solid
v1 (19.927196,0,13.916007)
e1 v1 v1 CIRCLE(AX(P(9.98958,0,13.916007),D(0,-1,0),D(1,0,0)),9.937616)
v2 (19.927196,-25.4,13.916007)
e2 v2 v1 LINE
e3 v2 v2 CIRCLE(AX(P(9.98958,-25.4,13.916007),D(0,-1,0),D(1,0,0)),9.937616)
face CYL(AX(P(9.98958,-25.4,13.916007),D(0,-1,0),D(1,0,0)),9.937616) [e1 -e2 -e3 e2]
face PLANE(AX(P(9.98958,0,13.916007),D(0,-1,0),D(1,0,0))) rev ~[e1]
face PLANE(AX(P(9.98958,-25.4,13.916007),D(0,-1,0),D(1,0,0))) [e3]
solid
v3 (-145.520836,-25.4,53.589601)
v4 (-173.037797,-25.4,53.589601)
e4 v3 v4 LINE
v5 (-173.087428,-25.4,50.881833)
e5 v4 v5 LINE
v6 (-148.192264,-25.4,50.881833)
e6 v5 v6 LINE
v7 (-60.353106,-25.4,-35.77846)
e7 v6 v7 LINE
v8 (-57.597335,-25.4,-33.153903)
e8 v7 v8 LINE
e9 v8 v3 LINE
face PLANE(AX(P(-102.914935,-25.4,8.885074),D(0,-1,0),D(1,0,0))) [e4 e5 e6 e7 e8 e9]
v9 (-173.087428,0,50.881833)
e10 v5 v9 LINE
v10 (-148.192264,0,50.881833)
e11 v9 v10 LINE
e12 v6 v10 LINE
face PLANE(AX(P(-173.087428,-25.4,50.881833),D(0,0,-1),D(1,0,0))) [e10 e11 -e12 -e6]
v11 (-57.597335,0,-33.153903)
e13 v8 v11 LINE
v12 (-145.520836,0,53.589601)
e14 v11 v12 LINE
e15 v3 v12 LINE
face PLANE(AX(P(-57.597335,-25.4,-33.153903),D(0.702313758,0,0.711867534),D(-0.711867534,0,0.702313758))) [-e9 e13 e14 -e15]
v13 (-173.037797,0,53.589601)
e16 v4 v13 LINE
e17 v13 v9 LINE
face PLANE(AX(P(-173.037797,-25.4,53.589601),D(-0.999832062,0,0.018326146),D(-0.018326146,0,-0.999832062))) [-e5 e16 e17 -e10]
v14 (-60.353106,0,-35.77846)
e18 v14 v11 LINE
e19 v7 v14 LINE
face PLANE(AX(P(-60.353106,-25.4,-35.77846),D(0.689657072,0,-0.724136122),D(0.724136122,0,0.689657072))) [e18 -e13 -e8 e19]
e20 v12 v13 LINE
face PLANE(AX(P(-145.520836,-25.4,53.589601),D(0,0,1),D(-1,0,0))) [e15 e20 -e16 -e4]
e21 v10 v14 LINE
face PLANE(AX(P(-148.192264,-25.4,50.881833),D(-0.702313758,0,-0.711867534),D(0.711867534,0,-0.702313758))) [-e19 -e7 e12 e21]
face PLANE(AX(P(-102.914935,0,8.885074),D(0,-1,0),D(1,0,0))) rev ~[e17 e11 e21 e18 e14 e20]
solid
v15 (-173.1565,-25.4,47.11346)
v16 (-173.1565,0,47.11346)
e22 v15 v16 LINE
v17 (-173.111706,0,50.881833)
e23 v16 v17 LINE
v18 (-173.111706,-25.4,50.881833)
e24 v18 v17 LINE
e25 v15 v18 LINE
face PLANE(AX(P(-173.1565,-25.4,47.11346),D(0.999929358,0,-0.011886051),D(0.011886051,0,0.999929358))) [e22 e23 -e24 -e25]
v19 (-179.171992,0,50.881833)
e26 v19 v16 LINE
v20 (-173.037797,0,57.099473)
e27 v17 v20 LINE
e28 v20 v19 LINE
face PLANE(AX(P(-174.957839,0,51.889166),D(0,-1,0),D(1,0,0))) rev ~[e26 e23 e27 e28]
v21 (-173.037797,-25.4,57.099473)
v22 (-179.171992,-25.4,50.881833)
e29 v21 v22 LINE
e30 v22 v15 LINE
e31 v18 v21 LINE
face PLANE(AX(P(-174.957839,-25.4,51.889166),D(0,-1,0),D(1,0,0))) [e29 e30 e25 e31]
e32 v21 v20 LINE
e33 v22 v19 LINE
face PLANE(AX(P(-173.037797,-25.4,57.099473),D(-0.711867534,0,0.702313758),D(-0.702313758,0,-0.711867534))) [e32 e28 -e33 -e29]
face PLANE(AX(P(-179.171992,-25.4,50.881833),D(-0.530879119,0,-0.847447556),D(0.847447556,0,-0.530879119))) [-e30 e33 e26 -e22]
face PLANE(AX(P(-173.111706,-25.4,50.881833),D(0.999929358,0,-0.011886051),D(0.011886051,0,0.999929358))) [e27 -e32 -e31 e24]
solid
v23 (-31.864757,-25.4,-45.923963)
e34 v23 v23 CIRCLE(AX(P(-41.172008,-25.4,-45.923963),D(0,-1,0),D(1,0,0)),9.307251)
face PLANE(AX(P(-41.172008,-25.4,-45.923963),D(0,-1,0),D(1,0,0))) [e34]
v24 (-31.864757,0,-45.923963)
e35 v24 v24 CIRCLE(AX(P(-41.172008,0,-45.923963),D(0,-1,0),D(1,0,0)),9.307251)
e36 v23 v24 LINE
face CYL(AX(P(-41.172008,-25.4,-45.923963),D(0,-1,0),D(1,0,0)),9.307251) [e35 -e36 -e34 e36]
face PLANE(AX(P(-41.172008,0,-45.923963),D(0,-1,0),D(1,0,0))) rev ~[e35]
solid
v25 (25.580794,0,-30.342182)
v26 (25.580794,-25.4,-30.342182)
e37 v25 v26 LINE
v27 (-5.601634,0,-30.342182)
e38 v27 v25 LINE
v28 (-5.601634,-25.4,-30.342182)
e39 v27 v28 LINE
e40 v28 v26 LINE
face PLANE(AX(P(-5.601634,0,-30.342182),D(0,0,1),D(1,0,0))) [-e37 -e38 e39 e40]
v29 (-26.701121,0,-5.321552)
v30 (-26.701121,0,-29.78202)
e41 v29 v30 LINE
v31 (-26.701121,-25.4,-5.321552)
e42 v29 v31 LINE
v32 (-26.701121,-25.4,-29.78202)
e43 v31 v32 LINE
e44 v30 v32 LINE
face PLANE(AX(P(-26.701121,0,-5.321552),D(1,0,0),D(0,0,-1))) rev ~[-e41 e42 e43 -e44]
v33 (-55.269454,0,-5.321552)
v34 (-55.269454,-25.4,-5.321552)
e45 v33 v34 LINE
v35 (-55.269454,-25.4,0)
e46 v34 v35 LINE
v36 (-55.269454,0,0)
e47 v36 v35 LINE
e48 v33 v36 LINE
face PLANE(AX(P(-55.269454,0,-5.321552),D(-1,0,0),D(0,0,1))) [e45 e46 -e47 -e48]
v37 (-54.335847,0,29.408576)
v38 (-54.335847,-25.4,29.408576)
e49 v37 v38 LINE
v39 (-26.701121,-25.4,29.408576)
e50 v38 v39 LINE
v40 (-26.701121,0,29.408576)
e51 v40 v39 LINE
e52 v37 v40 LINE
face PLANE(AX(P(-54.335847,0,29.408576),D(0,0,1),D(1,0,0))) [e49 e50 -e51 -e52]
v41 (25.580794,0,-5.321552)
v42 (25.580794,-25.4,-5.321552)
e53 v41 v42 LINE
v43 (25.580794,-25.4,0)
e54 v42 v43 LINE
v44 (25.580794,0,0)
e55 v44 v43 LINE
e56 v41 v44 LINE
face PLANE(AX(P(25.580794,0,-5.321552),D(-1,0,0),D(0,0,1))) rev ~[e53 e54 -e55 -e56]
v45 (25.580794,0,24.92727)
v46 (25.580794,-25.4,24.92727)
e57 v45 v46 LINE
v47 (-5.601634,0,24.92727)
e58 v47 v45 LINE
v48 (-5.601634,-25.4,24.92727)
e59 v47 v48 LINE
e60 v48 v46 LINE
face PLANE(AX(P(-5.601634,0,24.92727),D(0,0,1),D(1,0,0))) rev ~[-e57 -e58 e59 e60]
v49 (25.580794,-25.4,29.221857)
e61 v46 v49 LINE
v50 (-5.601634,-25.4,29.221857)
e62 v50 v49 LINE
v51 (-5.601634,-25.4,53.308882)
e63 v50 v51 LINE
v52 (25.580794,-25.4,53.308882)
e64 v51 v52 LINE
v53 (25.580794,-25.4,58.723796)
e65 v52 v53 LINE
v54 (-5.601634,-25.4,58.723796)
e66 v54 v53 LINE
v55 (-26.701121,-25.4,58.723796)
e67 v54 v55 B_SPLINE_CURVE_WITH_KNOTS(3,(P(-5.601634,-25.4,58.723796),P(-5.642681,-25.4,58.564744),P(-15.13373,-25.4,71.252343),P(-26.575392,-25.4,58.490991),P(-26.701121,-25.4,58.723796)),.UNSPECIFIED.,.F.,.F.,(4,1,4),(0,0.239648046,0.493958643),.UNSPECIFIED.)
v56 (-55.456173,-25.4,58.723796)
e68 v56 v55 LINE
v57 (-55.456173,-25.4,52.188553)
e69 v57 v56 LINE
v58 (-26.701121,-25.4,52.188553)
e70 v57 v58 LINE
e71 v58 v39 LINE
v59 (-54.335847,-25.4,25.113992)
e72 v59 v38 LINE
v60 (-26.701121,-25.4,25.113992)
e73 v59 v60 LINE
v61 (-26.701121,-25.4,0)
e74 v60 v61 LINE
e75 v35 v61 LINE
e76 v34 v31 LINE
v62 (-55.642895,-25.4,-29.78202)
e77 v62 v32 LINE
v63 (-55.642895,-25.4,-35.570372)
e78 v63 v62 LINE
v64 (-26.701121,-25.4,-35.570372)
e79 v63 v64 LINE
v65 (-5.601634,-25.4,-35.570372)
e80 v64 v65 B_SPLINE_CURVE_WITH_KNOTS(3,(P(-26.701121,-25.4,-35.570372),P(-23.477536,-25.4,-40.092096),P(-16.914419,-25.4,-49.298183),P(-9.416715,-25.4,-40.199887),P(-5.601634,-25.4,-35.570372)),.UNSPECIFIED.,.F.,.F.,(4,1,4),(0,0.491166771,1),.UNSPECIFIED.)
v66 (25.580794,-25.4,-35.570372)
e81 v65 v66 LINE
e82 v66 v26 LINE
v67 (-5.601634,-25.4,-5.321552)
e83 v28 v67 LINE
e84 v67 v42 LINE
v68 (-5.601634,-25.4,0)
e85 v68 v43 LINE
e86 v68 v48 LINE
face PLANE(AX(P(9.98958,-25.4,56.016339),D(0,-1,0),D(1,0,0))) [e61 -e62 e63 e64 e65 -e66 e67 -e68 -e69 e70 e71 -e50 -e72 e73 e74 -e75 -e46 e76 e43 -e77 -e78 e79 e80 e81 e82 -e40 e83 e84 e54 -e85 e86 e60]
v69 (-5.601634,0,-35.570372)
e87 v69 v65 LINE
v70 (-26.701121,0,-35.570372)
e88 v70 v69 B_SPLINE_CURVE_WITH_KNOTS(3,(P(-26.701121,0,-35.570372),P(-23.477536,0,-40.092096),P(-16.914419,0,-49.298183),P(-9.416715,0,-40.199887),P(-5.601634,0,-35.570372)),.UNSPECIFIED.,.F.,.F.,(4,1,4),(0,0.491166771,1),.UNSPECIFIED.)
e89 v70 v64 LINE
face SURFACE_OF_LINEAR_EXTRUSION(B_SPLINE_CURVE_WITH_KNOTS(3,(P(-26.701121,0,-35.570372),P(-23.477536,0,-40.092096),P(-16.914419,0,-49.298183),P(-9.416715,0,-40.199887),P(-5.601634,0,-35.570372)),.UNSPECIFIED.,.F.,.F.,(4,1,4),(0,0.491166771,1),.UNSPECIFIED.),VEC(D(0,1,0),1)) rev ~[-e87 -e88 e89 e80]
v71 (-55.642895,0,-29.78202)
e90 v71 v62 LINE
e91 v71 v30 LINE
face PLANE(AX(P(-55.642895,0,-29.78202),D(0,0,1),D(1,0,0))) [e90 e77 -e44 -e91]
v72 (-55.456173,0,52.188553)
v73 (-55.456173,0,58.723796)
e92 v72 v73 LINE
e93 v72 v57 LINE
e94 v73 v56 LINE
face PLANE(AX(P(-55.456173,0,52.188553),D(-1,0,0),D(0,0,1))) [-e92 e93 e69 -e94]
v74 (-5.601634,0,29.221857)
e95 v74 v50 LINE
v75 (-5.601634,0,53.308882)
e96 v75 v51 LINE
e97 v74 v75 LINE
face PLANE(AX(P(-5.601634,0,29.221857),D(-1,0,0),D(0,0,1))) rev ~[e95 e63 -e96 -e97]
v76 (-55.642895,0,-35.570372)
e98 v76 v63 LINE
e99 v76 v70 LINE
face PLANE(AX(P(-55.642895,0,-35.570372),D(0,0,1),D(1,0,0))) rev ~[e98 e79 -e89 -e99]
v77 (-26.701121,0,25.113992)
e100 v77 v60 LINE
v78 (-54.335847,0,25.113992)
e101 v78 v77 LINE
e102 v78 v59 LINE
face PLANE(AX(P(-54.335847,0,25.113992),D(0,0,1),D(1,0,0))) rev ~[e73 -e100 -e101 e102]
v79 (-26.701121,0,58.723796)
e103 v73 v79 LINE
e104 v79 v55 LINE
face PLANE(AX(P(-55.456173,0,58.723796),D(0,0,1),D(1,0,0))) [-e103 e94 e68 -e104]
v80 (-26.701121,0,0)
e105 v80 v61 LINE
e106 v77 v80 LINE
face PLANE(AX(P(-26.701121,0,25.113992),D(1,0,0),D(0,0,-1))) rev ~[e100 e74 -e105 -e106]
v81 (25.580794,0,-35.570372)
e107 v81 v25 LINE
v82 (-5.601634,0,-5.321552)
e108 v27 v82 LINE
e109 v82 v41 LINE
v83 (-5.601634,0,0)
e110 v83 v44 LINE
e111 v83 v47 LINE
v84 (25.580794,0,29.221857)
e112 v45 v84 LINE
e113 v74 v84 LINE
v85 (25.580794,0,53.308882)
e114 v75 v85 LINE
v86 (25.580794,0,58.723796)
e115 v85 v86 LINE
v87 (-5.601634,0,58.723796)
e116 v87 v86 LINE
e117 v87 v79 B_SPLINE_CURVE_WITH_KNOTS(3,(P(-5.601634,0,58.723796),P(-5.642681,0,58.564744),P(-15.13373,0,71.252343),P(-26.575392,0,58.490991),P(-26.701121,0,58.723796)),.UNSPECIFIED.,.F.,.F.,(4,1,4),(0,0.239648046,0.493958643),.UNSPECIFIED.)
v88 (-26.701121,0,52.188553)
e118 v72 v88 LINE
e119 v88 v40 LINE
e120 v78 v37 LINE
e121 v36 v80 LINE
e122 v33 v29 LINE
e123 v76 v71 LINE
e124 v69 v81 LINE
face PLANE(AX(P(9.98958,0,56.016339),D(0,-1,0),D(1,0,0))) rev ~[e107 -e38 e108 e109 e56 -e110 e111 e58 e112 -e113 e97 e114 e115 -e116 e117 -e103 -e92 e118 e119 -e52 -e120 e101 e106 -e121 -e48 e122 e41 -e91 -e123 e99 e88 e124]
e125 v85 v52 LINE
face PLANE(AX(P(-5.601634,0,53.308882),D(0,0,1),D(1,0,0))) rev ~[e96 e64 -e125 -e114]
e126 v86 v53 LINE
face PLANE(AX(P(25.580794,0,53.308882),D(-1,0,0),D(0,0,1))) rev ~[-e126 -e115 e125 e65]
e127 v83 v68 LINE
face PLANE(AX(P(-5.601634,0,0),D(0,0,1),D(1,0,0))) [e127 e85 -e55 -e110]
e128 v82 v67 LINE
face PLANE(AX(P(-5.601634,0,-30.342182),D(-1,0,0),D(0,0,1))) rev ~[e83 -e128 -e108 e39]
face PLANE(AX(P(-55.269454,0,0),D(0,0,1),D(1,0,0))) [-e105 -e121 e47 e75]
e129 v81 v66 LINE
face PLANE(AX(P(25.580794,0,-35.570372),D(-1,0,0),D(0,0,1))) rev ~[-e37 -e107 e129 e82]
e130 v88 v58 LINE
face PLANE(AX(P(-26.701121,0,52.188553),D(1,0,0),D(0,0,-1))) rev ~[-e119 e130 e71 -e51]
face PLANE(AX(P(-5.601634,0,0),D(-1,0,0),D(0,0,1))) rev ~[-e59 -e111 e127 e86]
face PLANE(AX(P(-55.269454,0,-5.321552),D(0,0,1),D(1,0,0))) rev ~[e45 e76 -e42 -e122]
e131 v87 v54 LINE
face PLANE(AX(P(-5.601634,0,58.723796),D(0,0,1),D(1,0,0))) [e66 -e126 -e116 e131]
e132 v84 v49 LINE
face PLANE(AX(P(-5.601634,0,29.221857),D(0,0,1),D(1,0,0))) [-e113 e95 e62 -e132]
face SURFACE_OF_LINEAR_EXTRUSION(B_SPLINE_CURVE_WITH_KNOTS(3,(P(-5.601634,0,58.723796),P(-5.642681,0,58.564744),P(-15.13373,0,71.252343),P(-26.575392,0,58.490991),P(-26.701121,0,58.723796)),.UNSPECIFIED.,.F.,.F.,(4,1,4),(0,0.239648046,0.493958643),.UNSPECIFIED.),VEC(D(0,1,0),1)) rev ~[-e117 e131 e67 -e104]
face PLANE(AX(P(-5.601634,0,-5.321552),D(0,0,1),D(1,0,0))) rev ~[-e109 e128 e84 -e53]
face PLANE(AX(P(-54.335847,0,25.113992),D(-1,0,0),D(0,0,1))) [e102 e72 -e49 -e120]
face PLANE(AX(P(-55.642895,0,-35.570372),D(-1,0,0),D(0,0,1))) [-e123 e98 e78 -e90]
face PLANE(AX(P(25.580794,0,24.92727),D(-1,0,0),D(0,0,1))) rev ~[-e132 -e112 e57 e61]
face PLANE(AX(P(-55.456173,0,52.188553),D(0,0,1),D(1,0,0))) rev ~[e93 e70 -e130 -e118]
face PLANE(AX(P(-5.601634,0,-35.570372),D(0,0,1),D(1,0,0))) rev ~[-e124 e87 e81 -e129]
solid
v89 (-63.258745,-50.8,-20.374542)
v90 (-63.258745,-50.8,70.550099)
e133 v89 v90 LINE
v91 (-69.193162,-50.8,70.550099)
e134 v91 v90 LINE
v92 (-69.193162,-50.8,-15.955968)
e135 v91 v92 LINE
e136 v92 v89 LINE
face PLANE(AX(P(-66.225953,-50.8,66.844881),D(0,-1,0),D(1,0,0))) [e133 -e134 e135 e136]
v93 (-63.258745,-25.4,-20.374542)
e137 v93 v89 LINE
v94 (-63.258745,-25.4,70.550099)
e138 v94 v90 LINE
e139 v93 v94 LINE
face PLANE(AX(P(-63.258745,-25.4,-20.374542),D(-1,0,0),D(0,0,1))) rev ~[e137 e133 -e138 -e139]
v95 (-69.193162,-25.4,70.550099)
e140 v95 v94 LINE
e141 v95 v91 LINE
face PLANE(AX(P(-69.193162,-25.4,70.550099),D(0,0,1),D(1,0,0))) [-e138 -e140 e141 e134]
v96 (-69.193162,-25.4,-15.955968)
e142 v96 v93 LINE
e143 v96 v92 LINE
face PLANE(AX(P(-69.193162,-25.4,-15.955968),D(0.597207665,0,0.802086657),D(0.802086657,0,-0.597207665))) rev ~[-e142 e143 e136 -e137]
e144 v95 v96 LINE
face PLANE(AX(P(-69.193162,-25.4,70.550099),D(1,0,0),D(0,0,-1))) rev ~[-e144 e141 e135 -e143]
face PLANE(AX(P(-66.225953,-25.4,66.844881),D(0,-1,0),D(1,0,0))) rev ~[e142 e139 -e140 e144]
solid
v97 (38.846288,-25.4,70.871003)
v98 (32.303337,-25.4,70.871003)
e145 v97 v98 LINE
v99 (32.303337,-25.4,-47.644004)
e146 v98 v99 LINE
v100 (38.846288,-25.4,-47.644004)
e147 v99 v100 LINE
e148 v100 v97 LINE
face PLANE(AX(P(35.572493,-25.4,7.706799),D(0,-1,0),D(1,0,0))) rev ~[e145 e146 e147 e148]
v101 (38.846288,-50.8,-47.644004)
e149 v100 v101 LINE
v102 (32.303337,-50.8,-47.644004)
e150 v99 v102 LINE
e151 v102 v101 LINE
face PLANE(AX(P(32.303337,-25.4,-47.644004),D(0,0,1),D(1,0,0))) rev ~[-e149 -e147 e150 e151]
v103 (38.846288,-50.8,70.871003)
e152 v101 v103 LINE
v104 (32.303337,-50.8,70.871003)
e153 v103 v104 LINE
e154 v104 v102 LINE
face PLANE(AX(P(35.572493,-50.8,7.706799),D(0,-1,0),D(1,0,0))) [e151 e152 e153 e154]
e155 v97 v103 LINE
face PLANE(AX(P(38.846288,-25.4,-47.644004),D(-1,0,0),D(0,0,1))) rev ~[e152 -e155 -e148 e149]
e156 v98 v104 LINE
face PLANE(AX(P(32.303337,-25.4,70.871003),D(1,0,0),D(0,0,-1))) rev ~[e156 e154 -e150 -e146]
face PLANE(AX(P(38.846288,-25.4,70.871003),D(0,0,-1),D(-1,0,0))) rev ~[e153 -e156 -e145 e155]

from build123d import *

# Parameters (mm, degrees)
F0_W     = 31.1824278906
F0_H     = 5.4149143398
F0_W_2   = 28.7550520152
F0_H_2   = 6.535243243
F0_W_3   = 27.6347268373
F0_H_3   = 4.2945835739
F0_H_4   = 4.2945872992
F0_H_5   = 5.3215520456
F0_W_4   = 28.5683330148
F0_W_5   = 28.9417747408
F0_H_6   = 5.7883523405
F0_H_7   = 5.2281897515
F1_DEPTH = 25.4
F2_R     = 9.9376162311
F3_DEPTH = 25.4
F2_R_2   = 9.3072509838
F5_DEPTH = 25.4
F4_W     = 5.9344172478
F4_H     = 7.4104368687


# Not quite as in the source:
# - the program builds the solid bodies; features that only make, move or delete a surface that nothing else refers to are left out


with BuildPart() as f1:
    # F0 (on Front) → F1 (new body)
    with BuildSketch(Plane.XZ):
        with Locations((9.9895796739, 56.0163389891)):
            Rectangle(F0_W, F0_H)
        with BuildLine():
            Line((-5.6016342714, 24.9272696674), (-5.6016342714, 29.2218569666))
            Line((-5.6016342714, 29.2218569666), (-5.6016342714, 53.3088818192))
            Line((-5.6016342714, 53.3088818192), (-5.6016342714, 58.723796159))
            add(Edge.make_bspline(
                [(-5.6016342714, 58.723796159), (-5.6426806139, 58.5647439553), (-15.1337303989, 71.2523431637), (-26.5753917973, 58.490990697), (-26.7011206597, 58.723796159)],
                knots=[0, 0, 0, 0, 0.2396480462, 0.4939586428, 0.4939586428, 0.4939586428, 0.4939586428], degree=3))
            Line((-26.7011206597, 58.723796159), (-26.7011206597, 52.188552916))
            Line((-26.7011206597, 52.188552916), (-26.7011206597, 29.408575967))
            Line((-26.7011206597, 29.408575967), (-26.7011206597, 25.113992393))
            Line((-26.7011206597, 25.113992393), (-26.7011206597, 0))
            Line((-26.7011206597, 0), (-26.7011206597, -5.3215520456))
            Line((-26.7011206597, -5.3215520456), (-26.7011206597, -16.7115405202))
            Line((-26.7011206597, -16.7115405202), (-26.7011206597, -29.7820195556))
            Line((-26.7011206597, -29.7820195556), (-26.7011206597, -35.570371896))
            add(Edge.make_bspline(
                [(-26.7011206597, -35.570371896), (-23.4775358451, -40.0920960999), (-16.914419193, -49.2981834607), (-9.4167152022, -40.1998873057), (-5.6016342714, -35.570371896)],
                knots=[0, 0, 0, 0, 0.4911667711, 1, 1, 1, 1], degree=3))
            Line((-5.6016342714, -35.570371896), (-5.6016342714, -30.3421821445))
            Line((-5.6016342714, -30.3421821445), (-5.6016342714, -5.3215520456))
            Line((-5.6016342714, -5.3215520456), (-5.6016342714, 0))
            Line((-5.6016342714, 0), (-5.6016342714, 24.9272696674))
        make_face()
        with Locations((-41.0786466673, 55.4561745375)):
            Rectangle(F0_W_2, F0_H_2)
        with Locations((-40.5184840783, 27.26128418)):
            Rectangle(F0_W_3, F0_H_3)
        with Locations((9.9895796739, 27.074563317)):
            Rectangle(F0_W, F0_H_4)
        with Locations((9.9895796739, -2.6607760228)):
            Rectangle(F0_W, F0_H_5)
        with Locations((-40.9852871671, -2.6607760228)):
            Rectangle(F0_W_4, F0_H_5)
        with Locations((-41.1720080301, -32.6761957258)):
            Rectangle(F0_W_5, F0_H_6)
        with Locations((9.9895796739, -32.9562770203)):
            Rectangle(F0_W, F0_H_7)
    extrude(amount=F1_DEPTH)


with BuildPart() as f3:
    # F2 (on face) → F3 (new body)
    with BuildSketch(Plane.XZ.offset(25.4)):
        with Locations((9.9895796739, 13.9160072431)):
            Circle(F2_R)
    extrude(amount=-F3_DEPTH)


with BuildPart() as f3b:
    # F2 (on face) → F3, piece 2 (new body)
    with BuildSketch(Plane.XZ.offset(25.4)):
        with Locations((-41.1720080301, -45.9239631891)):
            Circle(F2_R_2)
    extrude(amount=-F3_DEPTH)


with BuildPart() as f3c:
    # F2 (on face) → F3, piece 3 (new body)
    with BuildSketch(Plane.XZ.offset(25.4)):
        Polygon((-60.3531059439, -35.778459874), (-57.597335428, -33.1539027393), (-145.5208361149, 53.5896010697), (-148.1922638691, 50.881833114), align=None)
        Polygon((-148.1922638691, 50.881833114), (-145.5208361149, 53.5896010697), (-173.0377972126, 53.5896010697), (-173.0874284987, 50.881833114), align=None)
    extrude(amount=-F3_DEPTH)


with BuildPart() as f3d:
    # F2 (on face) → F3, piece 4 (new body)
    with BuildSketch(Plane.XZ.offset(25.4)):
        Polygon((-173.1564998627, 47.1134595573), (-173.111705617, 50.881833114), (-173.0377972126, 57.0994727314), (-179.1719916159, 50.881833114), align=None)
    extrude(amount=-F3_DEPTH)


with BuildPart() as f5:
    # F4 (on face) → F5 (new body)
    with BuildSketch(Plane.XZ.offset(25.4)):
        Polygon((38.8462878764, 62.9734322429), (32.3033370078, 63.1396621466), (32.3033370078, -47.6440042257), (38.8462878764, -47.6440042257), align=None)
        Polygon((32.3033370078, 70.8710029721), (32.3033370078, 63.1396621466), (38.8462878764, 62.9734322429), (38.8462878764, 70.8710029721), align=None)
    extrude(amount=F5_DEPTH)


with BuildPart() as f5b:
    # F4 (on face) → F5, piece 2 (new body)
    with BuildSketch(Plane.XZ.offset(25.4)):
        with Locations((-66.2259534001, 66.8448805809)):
            Rectangle(F4_W, F4_H)
        Polygon((-63.2587447762, -20.3745421022), (-63.2587447762, 63.1396621466), (-69.193162024, 63.1396621466), (-69.193162024, -15.9559678286), align=None)
    extrude(amount=F5_DEPTH)


solid = Compound([f1.part, f3.part, f3b.part, f3c.part, f3d.part, f5.part, f5b.part])
